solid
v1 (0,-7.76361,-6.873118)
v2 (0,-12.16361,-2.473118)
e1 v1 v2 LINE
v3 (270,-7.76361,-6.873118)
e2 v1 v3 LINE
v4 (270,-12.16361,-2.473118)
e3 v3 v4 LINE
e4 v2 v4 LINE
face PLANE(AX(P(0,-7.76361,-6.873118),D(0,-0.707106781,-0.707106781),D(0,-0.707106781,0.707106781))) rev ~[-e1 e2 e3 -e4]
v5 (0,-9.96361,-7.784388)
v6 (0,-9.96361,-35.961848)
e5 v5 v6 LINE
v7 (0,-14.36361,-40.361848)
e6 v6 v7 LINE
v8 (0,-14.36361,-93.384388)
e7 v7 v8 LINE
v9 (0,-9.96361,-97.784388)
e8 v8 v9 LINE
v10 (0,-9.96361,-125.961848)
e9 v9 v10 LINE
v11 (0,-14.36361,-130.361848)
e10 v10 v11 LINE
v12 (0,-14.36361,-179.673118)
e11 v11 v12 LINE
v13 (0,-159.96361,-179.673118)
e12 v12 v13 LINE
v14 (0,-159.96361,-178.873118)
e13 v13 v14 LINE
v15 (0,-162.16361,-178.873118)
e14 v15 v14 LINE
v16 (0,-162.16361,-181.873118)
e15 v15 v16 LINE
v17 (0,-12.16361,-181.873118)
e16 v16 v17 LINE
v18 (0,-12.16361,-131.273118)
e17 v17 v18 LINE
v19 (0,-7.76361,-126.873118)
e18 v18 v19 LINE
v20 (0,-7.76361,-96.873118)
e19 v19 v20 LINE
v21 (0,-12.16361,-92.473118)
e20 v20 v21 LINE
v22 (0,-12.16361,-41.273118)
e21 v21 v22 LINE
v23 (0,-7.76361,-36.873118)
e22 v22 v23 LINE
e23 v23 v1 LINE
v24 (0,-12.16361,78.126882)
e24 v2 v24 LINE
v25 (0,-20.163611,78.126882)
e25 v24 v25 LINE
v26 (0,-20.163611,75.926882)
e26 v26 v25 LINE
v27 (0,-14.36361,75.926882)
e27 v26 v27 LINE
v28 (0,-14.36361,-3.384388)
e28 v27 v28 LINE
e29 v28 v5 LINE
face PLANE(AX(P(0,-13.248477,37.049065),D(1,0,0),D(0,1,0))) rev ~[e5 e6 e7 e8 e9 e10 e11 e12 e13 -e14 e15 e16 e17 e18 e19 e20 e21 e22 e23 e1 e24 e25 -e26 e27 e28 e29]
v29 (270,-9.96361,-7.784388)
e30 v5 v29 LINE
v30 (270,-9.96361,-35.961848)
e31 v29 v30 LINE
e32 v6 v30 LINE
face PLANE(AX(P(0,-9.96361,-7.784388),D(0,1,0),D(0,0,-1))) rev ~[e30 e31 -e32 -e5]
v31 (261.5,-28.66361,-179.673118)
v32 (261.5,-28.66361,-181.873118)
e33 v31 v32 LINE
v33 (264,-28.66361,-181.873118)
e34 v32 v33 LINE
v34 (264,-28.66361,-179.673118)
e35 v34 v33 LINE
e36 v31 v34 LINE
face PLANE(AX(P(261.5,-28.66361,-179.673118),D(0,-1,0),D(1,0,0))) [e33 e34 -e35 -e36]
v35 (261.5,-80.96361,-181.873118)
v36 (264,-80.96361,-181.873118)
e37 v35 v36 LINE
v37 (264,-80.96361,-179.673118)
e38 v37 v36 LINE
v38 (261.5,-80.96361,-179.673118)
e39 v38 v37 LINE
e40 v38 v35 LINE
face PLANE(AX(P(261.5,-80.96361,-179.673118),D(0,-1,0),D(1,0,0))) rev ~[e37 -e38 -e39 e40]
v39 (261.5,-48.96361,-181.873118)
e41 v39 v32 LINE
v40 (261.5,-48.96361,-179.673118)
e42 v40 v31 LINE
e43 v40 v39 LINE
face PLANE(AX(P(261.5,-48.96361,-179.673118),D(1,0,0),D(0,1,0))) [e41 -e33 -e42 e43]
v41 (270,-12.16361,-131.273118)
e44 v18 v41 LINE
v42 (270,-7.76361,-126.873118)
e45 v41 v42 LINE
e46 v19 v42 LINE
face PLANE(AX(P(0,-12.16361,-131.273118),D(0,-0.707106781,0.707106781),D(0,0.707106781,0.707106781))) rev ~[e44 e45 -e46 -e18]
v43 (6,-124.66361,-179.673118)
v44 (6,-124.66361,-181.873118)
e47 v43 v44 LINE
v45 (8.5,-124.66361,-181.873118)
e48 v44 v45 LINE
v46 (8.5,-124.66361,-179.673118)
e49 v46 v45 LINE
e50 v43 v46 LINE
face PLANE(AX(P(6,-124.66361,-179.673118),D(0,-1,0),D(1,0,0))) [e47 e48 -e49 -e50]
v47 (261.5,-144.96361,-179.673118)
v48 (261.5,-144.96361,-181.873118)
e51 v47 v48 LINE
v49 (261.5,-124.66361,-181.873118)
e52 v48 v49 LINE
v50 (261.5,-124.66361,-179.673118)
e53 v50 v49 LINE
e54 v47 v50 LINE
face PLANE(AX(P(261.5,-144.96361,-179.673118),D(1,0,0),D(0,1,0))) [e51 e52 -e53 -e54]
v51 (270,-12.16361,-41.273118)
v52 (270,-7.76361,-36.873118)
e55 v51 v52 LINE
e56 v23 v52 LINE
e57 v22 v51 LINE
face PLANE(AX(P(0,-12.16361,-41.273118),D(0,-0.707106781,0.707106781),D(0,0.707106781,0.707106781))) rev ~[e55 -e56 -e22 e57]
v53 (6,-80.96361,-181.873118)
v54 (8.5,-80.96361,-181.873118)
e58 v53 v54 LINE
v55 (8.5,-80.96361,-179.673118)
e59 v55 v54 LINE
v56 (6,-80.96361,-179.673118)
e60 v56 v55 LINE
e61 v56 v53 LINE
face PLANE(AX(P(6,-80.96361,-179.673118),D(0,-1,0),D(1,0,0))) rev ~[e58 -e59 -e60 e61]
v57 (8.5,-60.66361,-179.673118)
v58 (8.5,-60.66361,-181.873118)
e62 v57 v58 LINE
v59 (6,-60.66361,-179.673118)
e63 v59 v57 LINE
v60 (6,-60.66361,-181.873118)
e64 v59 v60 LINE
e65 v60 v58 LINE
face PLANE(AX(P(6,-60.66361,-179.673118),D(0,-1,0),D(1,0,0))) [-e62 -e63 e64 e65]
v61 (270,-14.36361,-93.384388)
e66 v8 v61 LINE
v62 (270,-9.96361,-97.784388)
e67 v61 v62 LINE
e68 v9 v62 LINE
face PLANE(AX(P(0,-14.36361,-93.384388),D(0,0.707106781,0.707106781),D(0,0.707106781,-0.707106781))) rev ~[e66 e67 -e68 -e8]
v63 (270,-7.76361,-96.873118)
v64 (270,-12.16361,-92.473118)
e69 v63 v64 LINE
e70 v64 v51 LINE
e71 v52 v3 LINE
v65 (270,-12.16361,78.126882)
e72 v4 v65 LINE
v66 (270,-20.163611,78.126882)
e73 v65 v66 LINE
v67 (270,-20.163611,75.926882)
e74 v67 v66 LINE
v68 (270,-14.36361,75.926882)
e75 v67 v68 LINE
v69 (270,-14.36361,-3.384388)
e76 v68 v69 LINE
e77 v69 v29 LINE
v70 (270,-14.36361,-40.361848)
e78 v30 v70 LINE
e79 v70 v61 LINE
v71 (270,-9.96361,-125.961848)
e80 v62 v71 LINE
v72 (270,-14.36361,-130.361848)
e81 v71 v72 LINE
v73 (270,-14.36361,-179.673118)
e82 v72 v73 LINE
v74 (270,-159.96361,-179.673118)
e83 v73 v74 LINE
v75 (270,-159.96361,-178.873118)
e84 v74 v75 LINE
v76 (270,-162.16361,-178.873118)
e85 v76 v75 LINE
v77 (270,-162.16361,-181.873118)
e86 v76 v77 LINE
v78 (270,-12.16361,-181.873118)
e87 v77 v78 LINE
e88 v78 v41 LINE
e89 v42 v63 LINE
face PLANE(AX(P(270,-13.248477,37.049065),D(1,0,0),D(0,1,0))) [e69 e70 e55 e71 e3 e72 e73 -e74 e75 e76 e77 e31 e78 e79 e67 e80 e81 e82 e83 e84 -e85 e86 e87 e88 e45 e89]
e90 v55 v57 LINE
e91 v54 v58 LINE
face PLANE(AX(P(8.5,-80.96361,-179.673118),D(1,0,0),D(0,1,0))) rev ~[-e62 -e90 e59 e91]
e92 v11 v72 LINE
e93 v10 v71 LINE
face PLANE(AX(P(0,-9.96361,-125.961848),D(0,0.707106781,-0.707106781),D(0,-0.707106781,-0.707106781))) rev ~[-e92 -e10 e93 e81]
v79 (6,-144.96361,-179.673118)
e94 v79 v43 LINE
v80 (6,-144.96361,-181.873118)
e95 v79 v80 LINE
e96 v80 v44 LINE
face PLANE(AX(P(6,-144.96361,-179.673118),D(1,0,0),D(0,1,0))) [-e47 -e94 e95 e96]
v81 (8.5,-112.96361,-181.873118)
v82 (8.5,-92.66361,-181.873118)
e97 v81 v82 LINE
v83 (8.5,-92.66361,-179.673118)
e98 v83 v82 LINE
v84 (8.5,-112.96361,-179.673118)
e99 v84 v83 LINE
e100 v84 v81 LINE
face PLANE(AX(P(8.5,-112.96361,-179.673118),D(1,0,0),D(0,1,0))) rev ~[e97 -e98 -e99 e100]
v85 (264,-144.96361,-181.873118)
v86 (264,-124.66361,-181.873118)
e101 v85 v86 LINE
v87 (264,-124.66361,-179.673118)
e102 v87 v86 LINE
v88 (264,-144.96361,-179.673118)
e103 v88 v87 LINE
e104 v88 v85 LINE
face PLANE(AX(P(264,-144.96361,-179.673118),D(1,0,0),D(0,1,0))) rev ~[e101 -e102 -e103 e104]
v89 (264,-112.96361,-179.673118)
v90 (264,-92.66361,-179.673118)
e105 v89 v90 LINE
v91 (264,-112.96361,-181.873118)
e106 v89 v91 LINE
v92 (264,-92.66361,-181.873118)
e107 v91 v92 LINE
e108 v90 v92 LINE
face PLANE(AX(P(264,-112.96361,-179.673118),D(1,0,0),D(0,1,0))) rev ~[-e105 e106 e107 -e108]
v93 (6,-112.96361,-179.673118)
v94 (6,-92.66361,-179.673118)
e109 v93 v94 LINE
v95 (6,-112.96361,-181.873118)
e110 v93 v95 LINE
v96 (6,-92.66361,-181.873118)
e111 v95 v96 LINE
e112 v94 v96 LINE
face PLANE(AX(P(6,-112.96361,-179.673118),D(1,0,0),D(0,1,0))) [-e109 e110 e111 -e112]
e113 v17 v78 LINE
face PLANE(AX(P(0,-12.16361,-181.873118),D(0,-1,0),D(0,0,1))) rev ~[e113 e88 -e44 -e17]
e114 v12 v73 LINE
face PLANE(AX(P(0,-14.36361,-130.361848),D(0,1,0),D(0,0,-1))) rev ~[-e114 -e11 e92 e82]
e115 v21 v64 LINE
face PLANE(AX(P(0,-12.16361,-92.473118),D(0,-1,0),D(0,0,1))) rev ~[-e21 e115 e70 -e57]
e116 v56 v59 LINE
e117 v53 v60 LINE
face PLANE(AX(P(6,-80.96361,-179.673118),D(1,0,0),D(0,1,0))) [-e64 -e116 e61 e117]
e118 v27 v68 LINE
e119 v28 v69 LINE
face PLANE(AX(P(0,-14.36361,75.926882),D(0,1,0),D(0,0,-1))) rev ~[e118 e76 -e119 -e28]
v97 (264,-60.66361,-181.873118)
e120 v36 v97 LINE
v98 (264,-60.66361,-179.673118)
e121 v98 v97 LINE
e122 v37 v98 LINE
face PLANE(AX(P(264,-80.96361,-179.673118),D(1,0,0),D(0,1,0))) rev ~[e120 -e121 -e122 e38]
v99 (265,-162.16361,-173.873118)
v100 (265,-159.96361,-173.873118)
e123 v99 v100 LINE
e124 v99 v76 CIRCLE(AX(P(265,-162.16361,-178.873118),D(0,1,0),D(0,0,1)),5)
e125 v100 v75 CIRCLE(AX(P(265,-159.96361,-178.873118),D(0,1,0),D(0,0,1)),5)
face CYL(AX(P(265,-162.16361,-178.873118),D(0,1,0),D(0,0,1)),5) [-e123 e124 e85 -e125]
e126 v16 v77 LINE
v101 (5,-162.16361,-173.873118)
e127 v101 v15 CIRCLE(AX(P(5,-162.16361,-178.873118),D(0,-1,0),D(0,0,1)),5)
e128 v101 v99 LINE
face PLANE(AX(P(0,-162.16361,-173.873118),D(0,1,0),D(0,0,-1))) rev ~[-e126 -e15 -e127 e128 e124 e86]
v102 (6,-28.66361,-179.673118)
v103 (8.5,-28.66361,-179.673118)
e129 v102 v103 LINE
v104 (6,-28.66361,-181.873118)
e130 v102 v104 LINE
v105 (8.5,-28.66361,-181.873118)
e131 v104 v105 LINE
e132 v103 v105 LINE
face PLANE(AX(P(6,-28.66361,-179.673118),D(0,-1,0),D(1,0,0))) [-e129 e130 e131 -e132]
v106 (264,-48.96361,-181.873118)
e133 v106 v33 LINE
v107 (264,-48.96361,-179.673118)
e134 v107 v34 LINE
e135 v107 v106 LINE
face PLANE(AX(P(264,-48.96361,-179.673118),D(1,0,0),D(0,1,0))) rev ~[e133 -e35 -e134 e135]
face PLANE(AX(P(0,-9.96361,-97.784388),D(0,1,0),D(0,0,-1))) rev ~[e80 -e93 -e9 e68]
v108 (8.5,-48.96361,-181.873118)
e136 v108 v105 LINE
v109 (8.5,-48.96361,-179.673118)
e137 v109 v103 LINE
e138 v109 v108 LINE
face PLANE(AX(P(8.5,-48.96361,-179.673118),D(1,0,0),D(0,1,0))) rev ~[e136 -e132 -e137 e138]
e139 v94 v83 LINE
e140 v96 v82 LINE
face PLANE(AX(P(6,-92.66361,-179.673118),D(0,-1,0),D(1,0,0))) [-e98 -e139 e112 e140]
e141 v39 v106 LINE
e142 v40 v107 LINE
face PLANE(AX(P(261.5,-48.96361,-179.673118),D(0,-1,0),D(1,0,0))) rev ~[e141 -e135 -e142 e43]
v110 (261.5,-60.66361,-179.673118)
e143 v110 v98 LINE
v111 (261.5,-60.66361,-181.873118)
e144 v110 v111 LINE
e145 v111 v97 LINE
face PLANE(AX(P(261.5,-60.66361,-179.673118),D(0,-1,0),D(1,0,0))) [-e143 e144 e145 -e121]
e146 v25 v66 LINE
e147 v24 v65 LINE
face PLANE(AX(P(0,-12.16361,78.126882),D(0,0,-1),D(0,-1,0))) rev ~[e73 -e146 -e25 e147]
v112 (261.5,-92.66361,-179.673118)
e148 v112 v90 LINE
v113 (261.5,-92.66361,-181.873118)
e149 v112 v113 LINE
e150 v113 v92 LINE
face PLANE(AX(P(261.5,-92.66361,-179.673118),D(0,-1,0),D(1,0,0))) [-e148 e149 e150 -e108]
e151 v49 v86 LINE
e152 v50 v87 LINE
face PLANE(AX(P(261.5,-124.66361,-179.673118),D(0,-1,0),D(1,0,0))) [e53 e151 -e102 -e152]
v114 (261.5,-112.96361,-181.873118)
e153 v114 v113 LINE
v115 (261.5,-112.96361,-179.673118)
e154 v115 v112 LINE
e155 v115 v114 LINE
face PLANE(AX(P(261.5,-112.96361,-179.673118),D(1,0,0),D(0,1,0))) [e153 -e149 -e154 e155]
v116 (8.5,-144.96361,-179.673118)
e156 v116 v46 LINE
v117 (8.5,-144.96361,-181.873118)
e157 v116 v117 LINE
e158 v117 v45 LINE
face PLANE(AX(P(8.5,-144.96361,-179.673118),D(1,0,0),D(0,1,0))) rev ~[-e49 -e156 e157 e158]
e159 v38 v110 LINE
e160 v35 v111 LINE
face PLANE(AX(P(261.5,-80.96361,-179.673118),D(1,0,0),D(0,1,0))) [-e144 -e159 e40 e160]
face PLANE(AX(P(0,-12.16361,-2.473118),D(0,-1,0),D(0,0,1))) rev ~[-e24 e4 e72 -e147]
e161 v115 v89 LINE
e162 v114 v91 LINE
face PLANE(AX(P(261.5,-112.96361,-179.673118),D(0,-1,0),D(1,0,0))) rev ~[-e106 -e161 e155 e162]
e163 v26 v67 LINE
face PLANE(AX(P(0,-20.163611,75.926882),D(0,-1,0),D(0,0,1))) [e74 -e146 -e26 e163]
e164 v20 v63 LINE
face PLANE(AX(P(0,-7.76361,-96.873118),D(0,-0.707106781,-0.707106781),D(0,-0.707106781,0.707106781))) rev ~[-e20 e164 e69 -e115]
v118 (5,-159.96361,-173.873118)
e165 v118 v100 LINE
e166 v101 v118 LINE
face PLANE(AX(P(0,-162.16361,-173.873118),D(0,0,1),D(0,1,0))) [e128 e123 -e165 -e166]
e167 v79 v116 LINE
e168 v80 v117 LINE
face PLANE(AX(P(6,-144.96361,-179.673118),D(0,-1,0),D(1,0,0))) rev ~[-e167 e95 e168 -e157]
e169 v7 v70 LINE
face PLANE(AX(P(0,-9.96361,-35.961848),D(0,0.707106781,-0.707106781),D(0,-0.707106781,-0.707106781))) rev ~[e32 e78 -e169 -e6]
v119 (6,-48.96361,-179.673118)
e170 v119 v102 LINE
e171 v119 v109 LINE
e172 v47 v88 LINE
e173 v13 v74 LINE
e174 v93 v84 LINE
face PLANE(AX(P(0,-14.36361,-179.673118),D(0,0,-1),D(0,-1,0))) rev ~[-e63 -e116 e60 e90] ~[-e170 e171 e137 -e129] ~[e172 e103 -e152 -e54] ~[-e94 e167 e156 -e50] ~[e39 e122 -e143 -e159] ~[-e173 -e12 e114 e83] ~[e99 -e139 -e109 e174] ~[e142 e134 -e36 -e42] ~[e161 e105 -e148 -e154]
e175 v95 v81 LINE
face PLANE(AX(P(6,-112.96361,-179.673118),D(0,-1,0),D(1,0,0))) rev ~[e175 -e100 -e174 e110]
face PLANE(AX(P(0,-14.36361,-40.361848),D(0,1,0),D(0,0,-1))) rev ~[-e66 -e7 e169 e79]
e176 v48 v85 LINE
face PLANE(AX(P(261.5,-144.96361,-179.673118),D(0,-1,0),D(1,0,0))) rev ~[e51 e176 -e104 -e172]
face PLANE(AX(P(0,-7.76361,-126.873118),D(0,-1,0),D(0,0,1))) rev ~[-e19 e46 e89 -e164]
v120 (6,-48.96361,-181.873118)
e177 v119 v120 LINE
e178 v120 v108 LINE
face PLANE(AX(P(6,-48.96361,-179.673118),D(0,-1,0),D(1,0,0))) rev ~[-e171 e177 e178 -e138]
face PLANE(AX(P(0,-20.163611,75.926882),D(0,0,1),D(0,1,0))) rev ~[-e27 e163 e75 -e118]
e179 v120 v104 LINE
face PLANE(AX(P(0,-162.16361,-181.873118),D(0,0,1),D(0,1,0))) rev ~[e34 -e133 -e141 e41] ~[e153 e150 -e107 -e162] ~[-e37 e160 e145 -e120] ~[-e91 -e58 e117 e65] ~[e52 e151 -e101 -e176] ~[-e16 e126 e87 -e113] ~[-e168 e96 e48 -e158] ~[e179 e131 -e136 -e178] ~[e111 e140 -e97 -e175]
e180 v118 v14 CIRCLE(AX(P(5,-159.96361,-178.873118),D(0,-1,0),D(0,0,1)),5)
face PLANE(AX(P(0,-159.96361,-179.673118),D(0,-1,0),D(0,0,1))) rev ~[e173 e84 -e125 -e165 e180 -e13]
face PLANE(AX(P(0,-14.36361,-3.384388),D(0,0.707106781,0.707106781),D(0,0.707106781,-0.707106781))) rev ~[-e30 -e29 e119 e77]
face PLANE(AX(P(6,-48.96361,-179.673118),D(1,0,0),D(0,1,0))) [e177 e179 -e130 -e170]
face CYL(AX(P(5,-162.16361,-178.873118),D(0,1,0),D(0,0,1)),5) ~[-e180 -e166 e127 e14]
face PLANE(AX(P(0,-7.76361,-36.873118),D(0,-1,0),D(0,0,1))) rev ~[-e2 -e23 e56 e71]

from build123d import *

# Parameters (mm, degrees)
F0_W     = 5.800000261
F0_H     = 2.2
F0_W_2   = 2.2
F0_H_2   = 5.8
F1_DEPTH = 270
F2_R     = 5
F3_W     = 2.5
F3_H     = 20.3
F4_DEPTH = 25


with BuildPart() as f1:
    # F0 (on Right) → F1 (new body)
    with BuildSketch(Plane.YZ):
        Polygon((-14.3636103166, 75.9268823147), (-14.3636103166, 68.1268823147), (-14.3636103166, -0.2731176853), (-12.1636103166, -2.4731176853), (-12.1636103166, 68.1268823147), (-12.1636103166, 75.9268823147), align=None)
        Polygon((-12.1636103166, -2.4731176853), (-14.3636103166, -0.2731176853), (-14.3636103166, -3.3843875225), (-12.1636103166, -5.5843875225), align=None)
        with Locations((-17.2636104471, 77.0268823147)):
            Rectangle(F0_W, F0_H)
        with Locations((-13.2636103166, 77.0268823147)):
            Rectangle(F0_W_2, F0_H)
        Polygon((-7.7636103166, -6.8731176853), (-12.1636103166, -2.4731176853), (-12.1636103166, -5.5843875225), (-9.9636103166, -7.7843875225), (-9.9636103166, -35.9618478481), (-12.1636103166, -38.1618478481), (-12.1636103166, -41.2731176853), (-7.7636103166, -36.8731176853), align=None)
        Polygon((-14.3636103166, -43.4731176853), (-12.1636103166, -41.2731176853), (-12.1636103166, -38.1618478481), (-14.3636103166, -40.3618478481), align=None)
        Polygon((-12.1636103166, -92.4731176853), (-12.1636103166, -41.2731176853), (-14.3636103166, -43.4731176853), (-14.3636103166, -90.2731176853), align=None)
        Polygon((-7.7636103166, -96.8731176853), (-12.1636103166, -92.4731176853), (-12.1636103166, -95.5843875225), (-9.9636103166, -97.7843875225), (-9.9636103166, -125.9618478481), (-12.1636103166, -128.1618478481), (-12.1636103166, -131.2731176853), (-7.7636103166, -126.8731176853), align=None)
        Polygon((-12.1636103166, -95.5843875225), (-12.1636103166, -92.4731176853), (-14.3636103166, -90.2731176853), (-14.3636103166, -93.3843875225), align=None)
        Polygon((-14.3636103166, -133.4731176853), (-12.1636103166, -131.2731176853), (-12.1636103166, -128.1618478481), (-14.3636103166, -130.3618478481), align=None)
        Polygon((-12.1636103166, -179.6731176853), (-12.1636103166, -131.2731176853), (-14.3636103166, -133.4731176853), (-14.3636103166, -179.6731176853), align=None)
        Polygon((-12.1636103166, -181.8731176853), (-12.1636103166, -179.6731176853), (-14.3636103166, -179.6731176853), (-159.9636103166, -179.6731176853), (-159.9636103166, -181.8731176853), align=None)
        with Locations((-161.0636103166, -180.7731176853)):
            Rectangle(F0_W_2, F0_H)
        with Locations((-161.0636103166, -176.7731176853)):
            Rectangle(F0_W_2, F0_H_2)
    extrude(amount=F1_DEPTH)

    # F2
    f2_edges = [f1.edges().sort_by_distance(p)[0] for p in [
        (270, -161.06361, -173.873118),
        (0, -161.06361, -173.873118),
    ]]
    fillet(f2_edges, radius=F2_R)

    # F3 (on face) → F4 (cut)
    with BuildSketch(Plane.XY.offset(-179.6731176853)):
        with Locations((7.25, -134.8136103166)):
            Rectangle(F3_W, F3_H)
        with Locations((7.25, -102.8136103166)):
            Rectangle(F3_W, F3_H)
        with Locations((7.25, -70.8136103166)):
            Rectangle(F3_W, F3_H)
        with Locations((7.25, -38.8136103166)):
            Rectangle(F3_W, F3_H)
        with Locations((262.75, -134.8136103166)):
            Rectangle(F3_W, F3_H)
        with Locations((262.75, -102.8136103166)):
            Rectangle(F3_W, F3_H)
        with Locations((262.75, -70.8136103166)):
            Rectangle(F3_W, F3_H)
        with Locations((262.75, -38.8136103166)):
            Rectangle(F3_W, F3_H)
    extrude(amount=-F4_DEPTH, mode=Mode.SUBTRACT)


solid = f1.part
